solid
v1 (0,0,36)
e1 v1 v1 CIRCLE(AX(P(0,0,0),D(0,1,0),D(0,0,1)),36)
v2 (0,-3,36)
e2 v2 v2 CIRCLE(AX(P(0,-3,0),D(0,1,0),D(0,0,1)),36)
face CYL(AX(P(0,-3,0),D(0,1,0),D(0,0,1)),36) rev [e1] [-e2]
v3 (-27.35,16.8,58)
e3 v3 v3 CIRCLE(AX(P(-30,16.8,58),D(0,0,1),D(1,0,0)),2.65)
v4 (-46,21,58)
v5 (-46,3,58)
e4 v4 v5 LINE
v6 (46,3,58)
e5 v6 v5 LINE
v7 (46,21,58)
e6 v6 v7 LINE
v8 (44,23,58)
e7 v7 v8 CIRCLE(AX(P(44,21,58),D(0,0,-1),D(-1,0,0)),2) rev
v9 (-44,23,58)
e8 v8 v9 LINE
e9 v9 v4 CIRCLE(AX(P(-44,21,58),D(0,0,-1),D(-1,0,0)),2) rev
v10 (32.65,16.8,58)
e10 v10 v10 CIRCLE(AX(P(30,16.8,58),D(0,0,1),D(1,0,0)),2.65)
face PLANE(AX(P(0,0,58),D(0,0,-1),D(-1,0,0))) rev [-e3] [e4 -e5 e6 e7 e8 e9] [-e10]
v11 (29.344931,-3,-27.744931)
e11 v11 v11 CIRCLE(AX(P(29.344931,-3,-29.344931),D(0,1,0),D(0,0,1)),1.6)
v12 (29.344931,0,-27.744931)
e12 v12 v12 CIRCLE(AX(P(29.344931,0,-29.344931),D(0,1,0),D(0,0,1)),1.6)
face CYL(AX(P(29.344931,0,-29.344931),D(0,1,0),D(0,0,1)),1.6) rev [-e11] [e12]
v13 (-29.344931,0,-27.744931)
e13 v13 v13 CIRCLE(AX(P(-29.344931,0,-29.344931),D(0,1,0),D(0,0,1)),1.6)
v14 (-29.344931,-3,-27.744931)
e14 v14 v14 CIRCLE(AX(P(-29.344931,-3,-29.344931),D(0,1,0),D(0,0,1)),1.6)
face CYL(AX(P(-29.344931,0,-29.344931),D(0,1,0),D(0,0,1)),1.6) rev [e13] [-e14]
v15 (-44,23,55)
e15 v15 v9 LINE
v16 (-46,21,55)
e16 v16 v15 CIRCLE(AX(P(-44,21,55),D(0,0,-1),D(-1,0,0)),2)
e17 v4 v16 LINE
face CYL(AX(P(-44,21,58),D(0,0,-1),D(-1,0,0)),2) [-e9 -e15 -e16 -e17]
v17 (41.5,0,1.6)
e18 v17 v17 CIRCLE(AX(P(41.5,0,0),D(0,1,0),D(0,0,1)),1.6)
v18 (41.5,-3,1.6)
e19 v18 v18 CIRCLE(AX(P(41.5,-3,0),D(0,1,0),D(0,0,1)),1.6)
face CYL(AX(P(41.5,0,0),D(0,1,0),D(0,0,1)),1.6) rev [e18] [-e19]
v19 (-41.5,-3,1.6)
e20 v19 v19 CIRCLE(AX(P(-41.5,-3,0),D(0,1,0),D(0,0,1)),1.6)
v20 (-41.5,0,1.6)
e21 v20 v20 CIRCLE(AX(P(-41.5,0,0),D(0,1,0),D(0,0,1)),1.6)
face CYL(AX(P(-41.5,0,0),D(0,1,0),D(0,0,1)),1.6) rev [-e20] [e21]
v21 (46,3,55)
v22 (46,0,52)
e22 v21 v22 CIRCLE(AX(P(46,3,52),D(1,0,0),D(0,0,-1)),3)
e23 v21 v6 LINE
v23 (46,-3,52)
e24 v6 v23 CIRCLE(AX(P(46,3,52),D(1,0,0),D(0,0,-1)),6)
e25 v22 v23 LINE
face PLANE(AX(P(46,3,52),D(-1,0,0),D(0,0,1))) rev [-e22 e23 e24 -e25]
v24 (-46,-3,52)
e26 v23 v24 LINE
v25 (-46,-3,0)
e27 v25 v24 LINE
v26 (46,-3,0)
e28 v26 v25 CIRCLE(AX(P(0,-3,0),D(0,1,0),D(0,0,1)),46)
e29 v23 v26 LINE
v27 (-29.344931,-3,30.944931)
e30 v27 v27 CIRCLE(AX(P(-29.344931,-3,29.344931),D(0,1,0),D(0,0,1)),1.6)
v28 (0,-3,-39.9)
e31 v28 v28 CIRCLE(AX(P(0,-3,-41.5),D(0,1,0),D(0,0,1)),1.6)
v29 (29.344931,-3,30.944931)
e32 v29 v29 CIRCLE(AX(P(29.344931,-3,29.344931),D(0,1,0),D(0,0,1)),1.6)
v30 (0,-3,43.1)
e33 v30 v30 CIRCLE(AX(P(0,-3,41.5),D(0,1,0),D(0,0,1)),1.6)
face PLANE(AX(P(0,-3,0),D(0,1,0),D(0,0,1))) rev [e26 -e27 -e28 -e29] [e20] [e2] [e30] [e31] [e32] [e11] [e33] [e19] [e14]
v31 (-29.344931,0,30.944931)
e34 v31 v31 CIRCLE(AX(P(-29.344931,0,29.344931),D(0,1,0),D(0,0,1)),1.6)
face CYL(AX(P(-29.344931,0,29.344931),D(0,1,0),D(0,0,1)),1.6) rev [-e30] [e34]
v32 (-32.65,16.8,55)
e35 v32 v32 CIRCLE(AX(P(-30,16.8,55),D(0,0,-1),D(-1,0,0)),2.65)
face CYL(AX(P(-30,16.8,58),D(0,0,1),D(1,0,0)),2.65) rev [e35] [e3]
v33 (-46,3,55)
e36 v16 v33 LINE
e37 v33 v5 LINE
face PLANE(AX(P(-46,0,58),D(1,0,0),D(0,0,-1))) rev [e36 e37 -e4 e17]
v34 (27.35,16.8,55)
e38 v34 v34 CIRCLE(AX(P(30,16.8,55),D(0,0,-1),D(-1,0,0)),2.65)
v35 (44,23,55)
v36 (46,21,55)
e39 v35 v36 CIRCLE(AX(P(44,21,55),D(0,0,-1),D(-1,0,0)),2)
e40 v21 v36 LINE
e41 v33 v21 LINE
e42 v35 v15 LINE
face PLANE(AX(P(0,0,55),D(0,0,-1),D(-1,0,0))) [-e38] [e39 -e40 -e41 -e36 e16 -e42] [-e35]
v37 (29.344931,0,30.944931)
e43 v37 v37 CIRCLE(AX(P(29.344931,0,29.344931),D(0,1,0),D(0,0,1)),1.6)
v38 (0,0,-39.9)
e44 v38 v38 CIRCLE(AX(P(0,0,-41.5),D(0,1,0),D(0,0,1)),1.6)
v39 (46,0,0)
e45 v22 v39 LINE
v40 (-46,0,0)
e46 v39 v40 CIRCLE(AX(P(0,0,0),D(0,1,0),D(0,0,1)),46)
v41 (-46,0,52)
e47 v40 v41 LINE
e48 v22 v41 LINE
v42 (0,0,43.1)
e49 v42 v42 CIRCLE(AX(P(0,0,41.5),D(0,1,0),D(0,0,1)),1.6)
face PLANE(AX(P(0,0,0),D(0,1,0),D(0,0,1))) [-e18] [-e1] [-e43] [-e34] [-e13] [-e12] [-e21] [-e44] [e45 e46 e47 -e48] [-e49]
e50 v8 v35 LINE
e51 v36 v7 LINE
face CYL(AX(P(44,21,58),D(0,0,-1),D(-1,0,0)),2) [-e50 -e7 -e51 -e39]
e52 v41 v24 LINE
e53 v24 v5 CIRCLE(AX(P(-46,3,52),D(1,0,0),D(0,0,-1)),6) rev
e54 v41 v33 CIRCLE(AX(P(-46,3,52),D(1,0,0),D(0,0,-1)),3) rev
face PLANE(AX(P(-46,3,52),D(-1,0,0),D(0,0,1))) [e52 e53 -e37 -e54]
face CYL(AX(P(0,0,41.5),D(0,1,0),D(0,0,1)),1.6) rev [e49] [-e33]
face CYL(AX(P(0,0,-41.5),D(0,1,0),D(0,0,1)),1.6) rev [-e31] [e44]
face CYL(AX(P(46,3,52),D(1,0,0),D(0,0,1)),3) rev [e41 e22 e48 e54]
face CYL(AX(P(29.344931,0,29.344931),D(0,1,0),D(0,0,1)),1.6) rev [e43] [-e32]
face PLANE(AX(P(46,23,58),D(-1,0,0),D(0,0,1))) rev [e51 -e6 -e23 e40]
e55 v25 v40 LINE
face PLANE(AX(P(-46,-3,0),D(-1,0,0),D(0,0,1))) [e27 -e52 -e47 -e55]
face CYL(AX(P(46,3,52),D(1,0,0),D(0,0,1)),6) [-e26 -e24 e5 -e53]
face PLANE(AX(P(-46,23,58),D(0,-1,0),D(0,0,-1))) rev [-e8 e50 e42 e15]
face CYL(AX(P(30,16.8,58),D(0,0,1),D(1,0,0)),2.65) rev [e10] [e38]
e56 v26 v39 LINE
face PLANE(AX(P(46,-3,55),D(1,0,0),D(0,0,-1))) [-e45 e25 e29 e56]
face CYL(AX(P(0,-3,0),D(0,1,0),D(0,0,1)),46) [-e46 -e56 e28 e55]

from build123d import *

# Parameters (mm, degrees)
SKETCH1_R                    = 36
SKETCH1_R_2                  = 1
BASE_FLANGE1_DEPTH           = 3
EDGE_FLANGE1_STRIP_W         = 18
EDGE_FLANGE1_STRIP_H         = 3
EDGE_FLANGE1_STRIP_CUT_DEPTH = 92
EDGE_FLANGE1_DEPTH           = 92
EDGE_FLANGE1_START           = 3
EDGE_FLANGE1_PROFILE_W       = 92
EDGE_FLANGE1_PROFILE_H       = 20
EDGE_FLANGE1_PROFILE_R       = 1
EDGE_FLANGE1_FLAT_DEPTH      = 3
FILLET1_R                    = 2
M3_CLEARANCE_HOLE1_D         = 3.2
M3_CLEARANCE_HOLE1_DEPTH     = 136
M3_CLEARANCE_HOLE1_TIP       = 0.96137699
M5_CLEARANCE_HOLE1_D         = 5.3
M5_CLEARANCE_HOLE1_DEPTH     = 136
M5_CLEARANCE_HOLE1_TIP       = 1.59228064


# Sheet-metal steps are written as plain solids
with BuildPart() as part:
    # Sketch1 → Base-Flange1 (new body)
    with BuildSketch(Plane(origin=(0, 0, 0), x_dir=(1, 0, 0), z_dir=(0, 1, 0))):
        with BuildLine():
            Line((-46, 0), (-46, -55))
            Line((-46, -55), (46, -55))
            Line((46, -55), (46, 0))
            ThreePointArc((46, 0), (0, 46), (-46, 0))
        make_face()
        with Locations(Location((0, 0, 0), (0, 0, 270))):
            Circle(SKETCH1_R, mode=Mode.SUBTRACT)
        with Locations(Location((0, 41.5, 0), (0, 0, 270))):
            Circle(SKETCH1_R_2, mode=Mode.SUBTRACT)
        with Locations(Location((29.344931419, 29.344931419, 0), (0, 0, 270))):
            Circle(SKETCH1_R_2, mode=Mode.SUBTRACT)
        with Locations(Location((41.5, 0, 0), (0, 0, 270))):
            Circle(SKETCH1_R_2, mode=Mode.SUBTRACT)
        with Locations(Location((29.344931419, -29.344931419, 0), (0, 0, 270))):
            Circle(SKETCH1_R_2, mode=Mode.SUBTRACT)
        with Locations(Location((0, -41.5, 0), (0, 0, 270))):
            Circle(SKETCH1_R_2, mode=Mode.SUBTRACT)
        with Locations(Location((-29.344931419, -29.344931419, 0), (0, 0, 270))):
            Circle(SKETCH1_R_2, mode=Mode.SUBTRACT)
        with Locations(Location((-41.5, 0, 0), (0, 0, 270))):
            Circle(SKETCH1_R_2, mode=Mode.SUBTRACT)
        with Locations(Location((-29.344931419, 29.344931419, 0), (0, 0, 270))):
            Circle(SKETCH1_R_2, mode=Mode.SUBTRACT)
    extrude(amount=-BASE_FLANGE1_DEPTH)

    # Edge-Flange1 strip (across the edge) → Edge-Flange1 strip cut (cut)
    with BuildSketch(Plane(origin=(-46, 0, 55), x_dir=(0, 0, -1), z_dir=(1, 0, 0))):
        with Locations((-6, -1.5)):
            Rectangle(EDGE_FLANGE1_STRIP_W, EDGE_FLANGE1_STRIP_H)
    extrude(amount=EDGE_FLANGE1_STRIP_CUT_DEPTH, mode=Mode.SUBTRACT)

    # Edge-Flange1 bend section (across the edge) → Edge-Flange1 (add)
    with BuildSketch(Plane(origin=(-46, 0, 55), x_dir=(0, 0, -1), z_dir=(1, 0, 0))):
        with BuildLine():
            Line((-3, 3), (0, 3))
            ThreePointArc((0, 3), (0.878679656, 0.878679656), (3, 0))
            Line((3, 0), (3, -3))
            ThreePointArc((3, -3), (-1.242640687, -1.242640687), (-3, 3))
        make_face()
    extrude(amount=EDGE_FLANGE1_DEPTH)

    # Edge-Flange1 profile (on flange) → Edge-Flange1 flat (add)
    with BuildSketch(Plane.XY.offset(55).offset(EDGE_FLANGE1_START)):
        with Locations((0, 13)):
            Rectangle(EDGE_FLANGE1_PROFILE_W, EDGE_FLANGE1_PROFILE_H)
        with Locations((-30, 16.8)):
            Circle(EDGE_FLANGE1_PROFILE_R, mode=Mode.SUBTRACT)
        with Locations((30, 16.8)):
            Circle(EDGE_FLANGE1_PROFILE_R, mode=Mode.SUBTRACT)
    extrude(amount=-EDGE_FLANGE1_FLAT_DEPTH)

    # Fillet1
    fillet1_edges = [part.edges().sort_by_distance(p)[0] for p in [
        (-46, 23, 56.5),
        (46, 23, 56.5),
    ]]
    fillet(fillet1_edges, radius=FILLET1_R)

    # M3 Clearance Hole1
    with Locations(Plane(origin=(0, 0, 0), x_dir=(1, 0, 0), z_dir=(0, 1, 0))):
        with Locations((0, 41.5), (29.344931419, 29.344931419), (41.5, 0), (29.344931419, -29.344931419), (0, -41.5), (-29.344931419, -29.344931419), (-41.5, 0), (-29.344931419, 29.344931419)):
            Hole(M3_CLEARANCE_HOLE1_D / 2, depth=M3_CLEARANCE_HOLE1_DEPTH)
            with Locations((0, 0, -(M3_CLEARANCE_HOLE1_DEPTH + M3_CLEARANCE_HOLE1_TIP / 2))):  # 118° drill point
                Cone(0, M3_CLEARANCE_HOLE1_D / 2, M3_CLEARANCE_HOLE1_TIP, mode=Mode.SUBTRACT)

    # M5 Clearance Hole1
    with Locations(Plane.XY.offset(58)):
        with Locations((30, 16.8), (-30, 16.8)):
            Hole(M5_CLEARANCE_HOLE1_D / 2, depth=M5_CLEARANCE_HOLE1_DEPTH)
            with Locations((0, 0, -(M5_CLEARANCE_HOLE1_DEPTH + M5_CLEARANCE_HOLE1_TIP / 2))):  # 118° drill point
                Cone(0, M5_CLEARANCE_HOLE1_D / 2, M5_CLEARANCE_HOLE1_TIP, mode=Mode.SUBTRACT)


solid = part.part
